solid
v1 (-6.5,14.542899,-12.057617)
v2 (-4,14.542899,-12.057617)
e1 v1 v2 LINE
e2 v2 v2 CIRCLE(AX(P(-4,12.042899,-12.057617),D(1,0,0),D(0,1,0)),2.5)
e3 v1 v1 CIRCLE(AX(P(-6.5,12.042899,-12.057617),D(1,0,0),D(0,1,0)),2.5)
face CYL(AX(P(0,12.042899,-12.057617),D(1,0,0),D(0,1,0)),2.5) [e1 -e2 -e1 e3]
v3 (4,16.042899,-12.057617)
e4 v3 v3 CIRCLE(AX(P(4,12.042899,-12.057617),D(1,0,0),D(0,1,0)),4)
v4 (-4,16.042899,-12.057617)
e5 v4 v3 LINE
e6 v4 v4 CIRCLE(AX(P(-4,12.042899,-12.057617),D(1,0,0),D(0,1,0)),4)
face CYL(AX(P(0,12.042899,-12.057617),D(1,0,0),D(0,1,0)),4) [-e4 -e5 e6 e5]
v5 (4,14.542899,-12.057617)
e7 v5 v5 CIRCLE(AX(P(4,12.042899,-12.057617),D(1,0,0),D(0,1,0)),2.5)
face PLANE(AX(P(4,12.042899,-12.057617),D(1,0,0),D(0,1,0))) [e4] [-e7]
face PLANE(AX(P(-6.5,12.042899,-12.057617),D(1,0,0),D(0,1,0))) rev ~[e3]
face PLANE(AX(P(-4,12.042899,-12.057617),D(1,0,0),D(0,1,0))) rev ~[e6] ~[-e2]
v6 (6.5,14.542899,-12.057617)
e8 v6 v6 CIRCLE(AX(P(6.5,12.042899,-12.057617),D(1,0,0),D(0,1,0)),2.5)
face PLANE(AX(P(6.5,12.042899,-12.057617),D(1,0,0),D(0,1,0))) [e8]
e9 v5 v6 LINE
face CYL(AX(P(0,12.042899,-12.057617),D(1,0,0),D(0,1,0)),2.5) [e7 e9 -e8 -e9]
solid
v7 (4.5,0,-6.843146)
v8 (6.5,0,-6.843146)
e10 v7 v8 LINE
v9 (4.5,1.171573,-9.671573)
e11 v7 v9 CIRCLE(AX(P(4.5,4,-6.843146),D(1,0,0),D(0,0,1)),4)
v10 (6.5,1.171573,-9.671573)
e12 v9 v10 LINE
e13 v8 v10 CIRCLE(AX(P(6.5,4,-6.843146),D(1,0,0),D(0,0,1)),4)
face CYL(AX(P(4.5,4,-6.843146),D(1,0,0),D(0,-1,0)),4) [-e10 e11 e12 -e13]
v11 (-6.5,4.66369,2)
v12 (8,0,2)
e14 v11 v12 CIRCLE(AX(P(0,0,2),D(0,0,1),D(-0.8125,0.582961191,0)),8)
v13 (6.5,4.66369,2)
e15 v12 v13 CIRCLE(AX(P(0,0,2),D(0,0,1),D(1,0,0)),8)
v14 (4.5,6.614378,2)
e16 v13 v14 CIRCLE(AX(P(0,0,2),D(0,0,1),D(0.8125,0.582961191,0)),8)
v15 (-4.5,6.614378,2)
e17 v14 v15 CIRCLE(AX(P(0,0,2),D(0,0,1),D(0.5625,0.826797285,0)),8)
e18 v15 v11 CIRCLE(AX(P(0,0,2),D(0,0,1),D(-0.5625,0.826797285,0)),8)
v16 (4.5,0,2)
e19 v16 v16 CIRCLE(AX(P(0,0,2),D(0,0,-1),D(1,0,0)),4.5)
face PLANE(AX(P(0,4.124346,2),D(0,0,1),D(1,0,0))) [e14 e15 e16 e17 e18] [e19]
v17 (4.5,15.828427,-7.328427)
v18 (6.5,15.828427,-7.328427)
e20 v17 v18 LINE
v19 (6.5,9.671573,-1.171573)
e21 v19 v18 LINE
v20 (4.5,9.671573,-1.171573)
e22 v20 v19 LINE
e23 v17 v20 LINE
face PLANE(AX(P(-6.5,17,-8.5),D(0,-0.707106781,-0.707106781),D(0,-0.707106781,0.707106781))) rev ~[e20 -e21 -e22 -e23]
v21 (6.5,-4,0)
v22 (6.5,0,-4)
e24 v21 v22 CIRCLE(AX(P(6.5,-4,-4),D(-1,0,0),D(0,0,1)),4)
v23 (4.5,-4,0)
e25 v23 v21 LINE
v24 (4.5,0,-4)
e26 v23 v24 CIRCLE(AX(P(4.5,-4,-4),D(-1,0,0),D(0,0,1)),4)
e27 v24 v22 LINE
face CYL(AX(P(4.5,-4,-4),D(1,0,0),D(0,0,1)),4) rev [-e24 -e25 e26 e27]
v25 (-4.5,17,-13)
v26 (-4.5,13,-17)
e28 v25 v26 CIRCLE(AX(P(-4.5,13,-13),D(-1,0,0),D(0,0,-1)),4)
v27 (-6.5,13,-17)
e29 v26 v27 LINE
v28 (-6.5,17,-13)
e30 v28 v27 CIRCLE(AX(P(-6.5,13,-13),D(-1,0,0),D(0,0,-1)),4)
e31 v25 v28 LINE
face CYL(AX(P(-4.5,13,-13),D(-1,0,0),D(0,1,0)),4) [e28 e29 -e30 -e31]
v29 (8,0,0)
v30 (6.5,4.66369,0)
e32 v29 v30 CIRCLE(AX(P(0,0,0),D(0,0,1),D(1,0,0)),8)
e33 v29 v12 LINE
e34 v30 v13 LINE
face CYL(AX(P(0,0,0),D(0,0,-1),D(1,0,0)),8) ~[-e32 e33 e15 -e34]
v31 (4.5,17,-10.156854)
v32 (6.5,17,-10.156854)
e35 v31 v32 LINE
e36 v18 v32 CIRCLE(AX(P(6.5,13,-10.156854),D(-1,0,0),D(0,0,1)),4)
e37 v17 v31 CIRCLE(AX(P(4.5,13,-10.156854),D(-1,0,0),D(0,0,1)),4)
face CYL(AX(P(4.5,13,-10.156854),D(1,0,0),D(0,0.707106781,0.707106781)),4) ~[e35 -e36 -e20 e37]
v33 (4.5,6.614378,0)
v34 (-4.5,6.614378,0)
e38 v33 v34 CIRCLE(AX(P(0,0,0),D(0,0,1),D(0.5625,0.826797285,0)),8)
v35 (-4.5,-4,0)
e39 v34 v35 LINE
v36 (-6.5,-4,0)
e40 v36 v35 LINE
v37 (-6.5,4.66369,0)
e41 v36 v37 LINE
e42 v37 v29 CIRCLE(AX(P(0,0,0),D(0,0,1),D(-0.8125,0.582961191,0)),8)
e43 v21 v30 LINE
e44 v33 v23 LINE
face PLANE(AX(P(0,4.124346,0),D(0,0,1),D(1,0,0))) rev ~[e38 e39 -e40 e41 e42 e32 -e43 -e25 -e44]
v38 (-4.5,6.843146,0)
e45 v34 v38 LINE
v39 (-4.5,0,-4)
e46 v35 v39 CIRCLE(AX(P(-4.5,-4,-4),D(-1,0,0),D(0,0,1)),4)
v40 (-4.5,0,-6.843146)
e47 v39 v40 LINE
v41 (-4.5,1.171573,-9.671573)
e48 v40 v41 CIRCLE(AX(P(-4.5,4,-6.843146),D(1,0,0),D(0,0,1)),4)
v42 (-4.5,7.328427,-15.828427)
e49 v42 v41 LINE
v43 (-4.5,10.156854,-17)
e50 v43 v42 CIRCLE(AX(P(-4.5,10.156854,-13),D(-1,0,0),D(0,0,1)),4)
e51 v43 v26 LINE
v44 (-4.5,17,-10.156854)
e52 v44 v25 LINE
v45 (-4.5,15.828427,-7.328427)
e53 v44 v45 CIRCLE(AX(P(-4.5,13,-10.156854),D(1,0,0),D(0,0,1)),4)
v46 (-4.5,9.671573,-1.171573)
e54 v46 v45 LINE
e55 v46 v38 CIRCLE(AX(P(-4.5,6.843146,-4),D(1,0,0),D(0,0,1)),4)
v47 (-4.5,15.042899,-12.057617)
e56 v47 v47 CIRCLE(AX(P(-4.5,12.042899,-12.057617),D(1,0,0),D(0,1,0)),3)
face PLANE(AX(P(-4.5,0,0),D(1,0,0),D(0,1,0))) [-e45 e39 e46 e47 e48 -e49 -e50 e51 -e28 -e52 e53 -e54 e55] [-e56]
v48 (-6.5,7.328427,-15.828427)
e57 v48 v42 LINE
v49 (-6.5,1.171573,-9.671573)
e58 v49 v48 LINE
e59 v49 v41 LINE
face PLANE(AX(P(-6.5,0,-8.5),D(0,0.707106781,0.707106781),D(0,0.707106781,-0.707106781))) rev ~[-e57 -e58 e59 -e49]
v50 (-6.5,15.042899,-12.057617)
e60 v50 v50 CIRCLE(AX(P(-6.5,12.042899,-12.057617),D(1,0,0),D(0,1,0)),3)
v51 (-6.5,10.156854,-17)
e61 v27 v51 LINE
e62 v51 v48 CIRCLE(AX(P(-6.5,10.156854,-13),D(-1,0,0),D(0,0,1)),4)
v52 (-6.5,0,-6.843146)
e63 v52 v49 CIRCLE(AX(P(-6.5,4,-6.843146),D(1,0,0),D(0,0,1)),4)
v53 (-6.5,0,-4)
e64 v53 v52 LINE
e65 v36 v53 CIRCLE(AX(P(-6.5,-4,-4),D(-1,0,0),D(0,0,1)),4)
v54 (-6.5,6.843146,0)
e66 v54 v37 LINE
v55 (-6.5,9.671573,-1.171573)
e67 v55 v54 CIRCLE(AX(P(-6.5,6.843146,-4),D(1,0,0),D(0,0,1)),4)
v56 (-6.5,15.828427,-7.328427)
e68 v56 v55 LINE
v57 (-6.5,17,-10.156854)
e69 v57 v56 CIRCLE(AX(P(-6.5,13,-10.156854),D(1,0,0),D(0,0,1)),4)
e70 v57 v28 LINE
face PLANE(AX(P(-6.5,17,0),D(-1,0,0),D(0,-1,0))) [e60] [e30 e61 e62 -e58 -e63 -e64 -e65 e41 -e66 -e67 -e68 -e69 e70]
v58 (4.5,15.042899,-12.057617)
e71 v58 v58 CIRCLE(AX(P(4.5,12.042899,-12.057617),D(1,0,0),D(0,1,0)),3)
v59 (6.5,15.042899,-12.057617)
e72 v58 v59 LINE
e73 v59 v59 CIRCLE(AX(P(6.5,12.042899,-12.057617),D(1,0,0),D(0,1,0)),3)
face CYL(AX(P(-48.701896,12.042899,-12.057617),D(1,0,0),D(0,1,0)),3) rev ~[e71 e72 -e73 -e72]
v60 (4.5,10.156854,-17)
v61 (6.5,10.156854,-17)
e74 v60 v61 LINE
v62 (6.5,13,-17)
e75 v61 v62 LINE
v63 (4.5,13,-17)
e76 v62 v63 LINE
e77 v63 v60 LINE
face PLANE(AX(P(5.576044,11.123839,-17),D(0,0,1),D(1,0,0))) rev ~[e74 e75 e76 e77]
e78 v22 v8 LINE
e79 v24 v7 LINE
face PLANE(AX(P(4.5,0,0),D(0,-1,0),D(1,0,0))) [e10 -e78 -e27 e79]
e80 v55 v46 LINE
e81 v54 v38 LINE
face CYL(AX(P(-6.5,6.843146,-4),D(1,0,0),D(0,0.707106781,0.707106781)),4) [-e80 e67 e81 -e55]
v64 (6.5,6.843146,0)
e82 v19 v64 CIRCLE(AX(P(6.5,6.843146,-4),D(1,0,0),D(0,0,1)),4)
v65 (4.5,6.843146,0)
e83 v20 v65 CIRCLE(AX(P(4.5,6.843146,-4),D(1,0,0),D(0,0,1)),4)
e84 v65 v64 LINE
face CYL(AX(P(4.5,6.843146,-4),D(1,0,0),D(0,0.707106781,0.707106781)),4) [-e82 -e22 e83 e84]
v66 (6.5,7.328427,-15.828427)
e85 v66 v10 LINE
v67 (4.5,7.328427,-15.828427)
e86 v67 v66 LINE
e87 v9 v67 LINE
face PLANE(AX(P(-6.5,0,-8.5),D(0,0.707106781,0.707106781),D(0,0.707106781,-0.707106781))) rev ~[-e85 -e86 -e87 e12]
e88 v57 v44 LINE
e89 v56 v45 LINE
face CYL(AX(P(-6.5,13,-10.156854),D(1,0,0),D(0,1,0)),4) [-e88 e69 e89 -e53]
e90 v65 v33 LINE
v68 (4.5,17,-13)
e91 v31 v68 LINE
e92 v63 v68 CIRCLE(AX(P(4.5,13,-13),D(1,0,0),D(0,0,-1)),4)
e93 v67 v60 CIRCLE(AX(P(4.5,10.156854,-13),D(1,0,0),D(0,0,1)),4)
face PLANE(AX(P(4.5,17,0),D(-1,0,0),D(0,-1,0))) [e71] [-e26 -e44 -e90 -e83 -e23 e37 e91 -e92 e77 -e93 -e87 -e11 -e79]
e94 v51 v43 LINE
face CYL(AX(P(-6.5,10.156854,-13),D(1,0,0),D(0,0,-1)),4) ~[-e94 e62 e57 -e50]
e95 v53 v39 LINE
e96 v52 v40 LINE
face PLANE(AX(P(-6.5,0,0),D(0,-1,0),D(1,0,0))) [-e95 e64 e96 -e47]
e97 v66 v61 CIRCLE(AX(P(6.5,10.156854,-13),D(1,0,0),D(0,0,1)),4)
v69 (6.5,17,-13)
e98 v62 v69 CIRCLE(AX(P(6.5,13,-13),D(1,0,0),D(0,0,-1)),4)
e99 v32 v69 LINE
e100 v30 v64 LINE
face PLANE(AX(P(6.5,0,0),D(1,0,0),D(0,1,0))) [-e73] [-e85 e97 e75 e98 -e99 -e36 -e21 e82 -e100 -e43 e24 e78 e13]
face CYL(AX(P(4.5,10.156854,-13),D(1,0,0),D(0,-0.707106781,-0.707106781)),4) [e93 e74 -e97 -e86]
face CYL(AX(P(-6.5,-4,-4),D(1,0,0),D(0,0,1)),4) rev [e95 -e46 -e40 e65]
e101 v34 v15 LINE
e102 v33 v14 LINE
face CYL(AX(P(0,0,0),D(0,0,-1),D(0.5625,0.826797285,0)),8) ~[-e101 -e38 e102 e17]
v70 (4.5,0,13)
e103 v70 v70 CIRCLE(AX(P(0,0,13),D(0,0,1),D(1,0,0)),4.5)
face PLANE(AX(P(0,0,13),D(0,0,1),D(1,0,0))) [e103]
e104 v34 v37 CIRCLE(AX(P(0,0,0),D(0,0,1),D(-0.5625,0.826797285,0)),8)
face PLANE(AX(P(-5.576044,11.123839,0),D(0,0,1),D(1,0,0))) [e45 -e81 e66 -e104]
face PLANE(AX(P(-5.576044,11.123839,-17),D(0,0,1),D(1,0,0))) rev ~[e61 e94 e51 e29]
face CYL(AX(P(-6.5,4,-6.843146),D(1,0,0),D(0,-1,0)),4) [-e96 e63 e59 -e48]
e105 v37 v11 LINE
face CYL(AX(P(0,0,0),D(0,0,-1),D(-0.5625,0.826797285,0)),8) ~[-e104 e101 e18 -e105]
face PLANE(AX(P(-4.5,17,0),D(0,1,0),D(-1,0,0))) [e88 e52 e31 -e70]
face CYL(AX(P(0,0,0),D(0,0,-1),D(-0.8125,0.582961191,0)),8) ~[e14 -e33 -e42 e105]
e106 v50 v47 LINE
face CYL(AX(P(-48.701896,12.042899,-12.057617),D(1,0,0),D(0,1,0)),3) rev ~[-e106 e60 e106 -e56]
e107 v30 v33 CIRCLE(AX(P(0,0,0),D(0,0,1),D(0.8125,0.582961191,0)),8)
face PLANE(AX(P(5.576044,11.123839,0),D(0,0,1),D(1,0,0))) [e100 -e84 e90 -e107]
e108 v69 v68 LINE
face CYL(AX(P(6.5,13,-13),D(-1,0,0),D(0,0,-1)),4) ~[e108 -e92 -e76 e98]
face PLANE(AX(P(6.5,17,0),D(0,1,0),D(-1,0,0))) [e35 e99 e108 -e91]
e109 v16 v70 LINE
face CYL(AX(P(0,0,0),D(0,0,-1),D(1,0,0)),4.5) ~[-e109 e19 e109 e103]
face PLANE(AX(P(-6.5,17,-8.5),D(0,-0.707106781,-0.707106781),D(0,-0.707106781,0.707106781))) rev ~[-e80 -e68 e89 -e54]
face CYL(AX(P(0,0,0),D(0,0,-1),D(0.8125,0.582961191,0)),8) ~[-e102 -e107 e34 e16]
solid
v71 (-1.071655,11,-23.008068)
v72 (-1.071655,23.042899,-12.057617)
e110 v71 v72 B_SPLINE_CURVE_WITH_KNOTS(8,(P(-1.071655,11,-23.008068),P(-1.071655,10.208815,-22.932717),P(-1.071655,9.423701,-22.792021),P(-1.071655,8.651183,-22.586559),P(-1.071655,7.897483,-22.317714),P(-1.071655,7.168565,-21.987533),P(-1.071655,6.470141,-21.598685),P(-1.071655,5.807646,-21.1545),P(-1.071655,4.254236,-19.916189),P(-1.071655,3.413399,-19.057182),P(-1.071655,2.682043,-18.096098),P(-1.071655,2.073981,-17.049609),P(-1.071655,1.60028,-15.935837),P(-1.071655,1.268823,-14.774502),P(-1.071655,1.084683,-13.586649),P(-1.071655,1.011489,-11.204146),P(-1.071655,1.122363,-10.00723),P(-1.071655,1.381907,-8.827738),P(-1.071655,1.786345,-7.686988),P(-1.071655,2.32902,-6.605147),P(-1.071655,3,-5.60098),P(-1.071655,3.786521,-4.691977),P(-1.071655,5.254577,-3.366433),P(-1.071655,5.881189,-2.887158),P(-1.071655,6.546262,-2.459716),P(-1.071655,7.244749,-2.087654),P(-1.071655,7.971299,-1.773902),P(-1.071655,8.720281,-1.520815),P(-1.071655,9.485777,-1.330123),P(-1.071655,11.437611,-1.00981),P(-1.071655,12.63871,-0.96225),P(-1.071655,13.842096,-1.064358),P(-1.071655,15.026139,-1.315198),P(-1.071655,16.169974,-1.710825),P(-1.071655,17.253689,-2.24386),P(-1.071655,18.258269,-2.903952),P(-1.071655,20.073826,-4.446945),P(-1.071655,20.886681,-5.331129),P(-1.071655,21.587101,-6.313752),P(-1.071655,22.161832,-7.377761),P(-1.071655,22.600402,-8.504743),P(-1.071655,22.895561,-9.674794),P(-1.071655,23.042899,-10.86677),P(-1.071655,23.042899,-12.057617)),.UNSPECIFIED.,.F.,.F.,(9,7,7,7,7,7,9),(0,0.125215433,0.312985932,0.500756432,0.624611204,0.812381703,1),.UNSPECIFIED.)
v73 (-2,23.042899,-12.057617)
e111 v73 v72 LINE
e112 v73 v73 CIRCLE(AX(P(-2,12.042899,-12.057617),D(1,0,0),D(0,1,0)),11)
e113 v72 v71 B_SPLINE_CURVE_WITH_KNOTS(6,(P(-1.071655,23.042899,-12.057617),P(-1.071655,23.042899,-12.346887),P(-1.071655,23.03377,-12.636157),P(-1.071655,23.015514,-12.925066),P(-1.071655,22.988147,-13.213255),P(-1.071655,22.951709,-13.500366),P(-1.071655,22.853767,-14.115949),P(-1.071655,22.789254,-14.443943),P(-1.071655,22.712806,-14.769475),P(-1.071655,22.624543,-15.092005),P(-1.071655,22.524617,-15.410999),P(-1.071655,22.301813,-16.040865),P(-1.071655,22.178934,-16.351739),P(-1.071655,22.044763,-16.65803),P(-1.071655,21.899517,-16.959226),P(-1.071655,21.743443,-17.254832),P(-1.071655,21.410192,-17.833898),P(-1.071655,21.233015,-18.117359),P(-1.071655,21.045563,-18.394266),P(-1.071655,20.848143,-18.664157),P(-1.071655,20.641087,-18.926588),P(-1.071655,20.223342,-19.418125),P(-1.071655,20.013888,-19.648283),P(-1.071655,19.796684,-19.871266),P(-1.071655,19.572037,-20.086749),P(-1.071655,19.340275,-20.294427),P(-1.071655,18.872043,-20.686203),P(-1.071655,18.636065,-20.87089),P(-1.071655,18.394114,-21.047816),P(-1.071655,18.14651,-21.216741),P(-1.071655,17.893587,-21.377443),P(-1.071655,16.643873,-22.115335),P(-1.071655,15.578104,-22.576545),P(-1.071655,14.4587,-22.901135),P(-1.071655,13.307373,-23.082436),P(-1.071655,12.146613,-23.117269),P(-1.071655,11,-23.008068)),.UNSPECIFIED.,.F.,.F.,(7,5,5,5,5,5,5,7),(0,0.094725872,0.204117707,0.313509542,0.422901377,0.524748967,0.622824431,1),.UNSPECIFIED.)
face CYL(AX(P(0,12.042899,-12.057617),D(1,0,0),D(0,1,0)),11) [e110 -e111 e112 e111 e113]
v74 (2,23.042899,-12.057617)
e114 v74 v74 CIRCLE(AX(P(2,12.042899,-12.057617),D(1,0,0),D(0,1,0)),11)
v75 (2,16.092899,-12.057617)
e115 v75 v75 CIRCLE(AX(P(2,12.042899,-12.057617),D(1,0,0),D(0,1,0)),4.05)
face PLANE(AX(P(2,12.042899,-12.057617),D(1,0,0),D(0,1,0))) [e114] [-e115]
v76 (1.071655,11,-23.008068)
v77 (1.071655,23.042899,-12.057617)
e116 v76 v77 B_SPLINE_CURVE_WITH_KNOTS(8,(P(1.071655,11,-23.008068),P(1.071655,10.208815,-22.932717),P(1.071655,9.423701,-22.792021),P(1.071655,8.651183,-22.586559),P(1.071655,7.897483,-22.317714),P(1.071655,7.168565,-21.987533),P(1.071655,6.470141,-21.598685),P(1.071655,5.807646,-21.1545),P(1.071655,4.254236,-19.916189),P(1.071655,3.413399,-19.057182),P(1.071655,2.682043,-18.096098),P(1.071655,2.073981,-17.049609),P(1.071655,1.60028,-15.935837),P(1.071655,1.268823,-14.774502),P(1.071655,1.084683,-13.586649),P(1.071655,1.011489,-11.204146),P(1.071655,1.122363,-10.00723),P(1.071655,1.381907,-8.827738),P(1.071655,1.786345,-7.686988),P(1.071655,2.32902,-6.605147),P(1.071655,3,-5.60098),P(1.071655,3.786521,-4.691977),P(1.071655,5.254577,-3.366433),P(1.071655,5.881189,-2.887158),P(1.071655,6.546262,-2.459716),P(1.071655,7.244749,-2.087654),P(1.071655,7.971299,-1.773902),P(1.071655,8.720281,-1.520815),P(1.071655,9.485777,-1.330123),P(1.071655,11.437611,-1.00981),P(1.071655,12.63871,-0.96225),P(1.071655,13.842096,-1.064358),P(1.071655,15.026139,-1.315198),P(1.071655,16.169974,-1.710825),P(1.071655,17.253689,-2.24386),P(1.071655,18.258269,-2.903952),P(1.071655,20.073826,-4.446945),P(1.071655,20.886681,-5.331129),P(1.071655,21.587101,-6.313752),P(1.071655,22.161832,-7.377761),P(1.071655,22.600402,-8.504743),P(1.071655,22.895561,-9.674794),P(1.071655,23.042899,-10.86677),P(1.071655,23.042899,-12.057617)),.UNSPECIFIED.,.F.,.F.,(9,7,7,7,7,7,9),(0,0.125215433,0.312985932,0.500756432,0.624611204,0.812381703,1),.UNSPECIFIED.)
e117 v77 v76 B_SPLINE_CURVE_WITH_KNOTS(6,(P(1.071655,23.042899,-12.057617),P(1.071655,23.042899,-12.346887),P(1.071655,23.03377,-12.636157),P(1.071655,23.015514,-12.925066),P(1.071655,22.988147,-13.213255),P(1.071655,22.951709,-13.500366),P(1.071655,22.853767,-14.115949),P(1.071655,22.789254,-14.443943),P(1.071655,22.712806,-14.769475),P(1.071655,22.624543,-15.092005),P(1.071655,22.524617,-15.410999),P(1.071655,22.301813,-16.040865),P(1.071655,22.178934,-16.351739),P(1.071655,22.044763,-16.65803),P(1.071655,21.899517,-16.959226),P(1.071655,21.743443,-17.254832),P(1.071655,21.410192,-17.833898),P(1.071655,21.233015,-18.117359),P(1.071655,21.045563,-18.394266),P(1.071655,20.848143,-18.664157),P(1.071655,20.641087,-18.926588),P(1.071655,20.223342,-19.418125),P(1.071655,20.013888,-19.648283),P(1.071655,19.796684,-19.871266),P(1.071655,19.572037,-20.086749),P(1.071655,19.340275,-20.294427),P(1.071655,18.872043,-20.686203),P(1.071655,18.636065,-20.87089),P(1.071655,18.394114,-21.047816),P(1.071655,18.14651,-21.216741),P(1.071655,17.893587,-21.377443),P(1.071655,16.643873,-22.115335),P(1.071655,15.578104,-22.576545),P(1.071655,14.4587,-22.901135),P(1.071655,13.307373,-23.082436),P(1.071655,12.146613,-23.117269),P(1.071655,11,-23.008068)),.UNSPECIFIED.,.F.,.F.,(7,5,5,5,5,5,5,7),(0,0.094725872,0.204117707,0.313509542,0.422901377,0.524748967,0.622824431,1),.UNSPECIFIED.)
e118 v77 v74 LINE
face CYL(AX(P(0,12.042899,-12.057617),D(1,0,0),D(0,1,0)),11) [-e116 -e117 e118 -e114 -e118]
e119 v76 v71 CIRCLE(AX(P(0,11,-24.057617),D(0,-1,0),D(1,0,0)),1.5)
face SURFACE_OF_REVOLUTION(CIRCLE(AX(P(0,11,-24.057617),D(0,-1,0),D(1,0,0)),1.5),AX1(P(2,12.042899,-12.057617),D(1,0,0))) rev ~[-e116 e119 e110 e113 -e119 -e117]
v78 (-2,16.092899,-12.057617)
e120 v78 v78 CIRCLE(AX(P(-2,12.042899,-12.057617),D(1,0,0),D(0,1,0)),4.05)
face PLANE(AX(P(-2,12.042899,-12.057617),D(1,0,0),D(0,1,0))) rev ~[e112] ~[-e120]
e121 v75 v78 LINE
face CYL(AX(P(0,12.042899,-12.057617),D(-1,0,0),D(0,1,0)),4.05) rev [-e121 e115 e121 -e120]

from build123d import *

# Parameters (mm, degrees)
F1_DEPTH  = 13
F2_DEPTH  = 2
F3_DEPTH  = 17
F5_DEPTH  = 14
F6_R      = 4
F7_D      = 6
F8_R      = 11
F8_R_2    = 4.05
F9_DEPTH  = 2
F8_R_3    = 2.5
F10_DEPTH = 6.5
F8_R_4    = 4
F11_DEPTH = 4
F13_R     = 1.5


with BuildPart() as f1:
    # F0 (on Top) → F1 (new body)
    with BuildSketch(Plane.XY):
        with BuildLine():
            ThreePointArc((-4.5, 0), (0, -4.5), (4.5, 0))
            ThreePointArc((4.5, 0), (0, 4.5), (-4.5, 0))
        make_face()
    extrude(amount=F1_DEPTH)

    # F0 (on Top) → F2 (join)
    with BuildSketch(Plane.XY):
        with BuildLine():
            ThreePointArc((-4.5, 0), (0, 4.5), (4.5, 0))
            Line((4.5, 0), (4.5, 6.6143782777))
            ThreePointArc((4.5, 6.6143782777), (0, 8), (-4.5, 6.6143782777))
            Line((-4.5, 6.6143782777), (-4.5, 0))
        make_face()
        with BuildLine():
            Line((-6.5, 0), (-4.5, 0))
            Line((-4.5, 0), (-4.5, 6.6143782777))
            ThreePointArc((-4.5, 6.6143782777), (-5.5858120852, 5.7270152217), (-6.5, 4.6636895265))
            Line((-6.5, 4.6636895265), (-6.5, 0))
        make_face()
        with BuildLine():
            Line((6.5, 0), (4.5, 0))
            ThreePointArc((4.5, 0), (0, -4.5), (-4.5, 0))
            Line((-4.5, 0), (-6.5, 0))
            Line((-6.5, 0), (-6.5, 4.6636895265))
            ThreePointArc((-6.5, 4.6636895265), (-2.4494897428, -7.6157731059), (8, 0))
            ThreePointArc((8, 0), (7.6157731059, 2.4494897428), (6.5, 4.6636895265))
            Line((6.5, 4.6636895265), (6.5, 0))
        make_face()
        with BuildLine():
            Line((4.5, 6.6143782777), (4.5, 0))
            Line((4.5, 0), (6.5, 0))
            Line((6.5, 0), (6.5, 4.6636895265))
            ThreePointArc((6.5, 4.6636895265), (5.5858120852, 5.7270152217), (4.5, 6.6143782777))
        make_face()
    extrude(amount=F2_DEPTH)

    # F0 (on Top) → F3 (join)
    with BuildSketch(Plane.XY):
        with BuildLine():
            ThreePointArc((-6.5, 4.6636895265), (-5.5858120852, 5.7270152217), (-4.5, 6.6143782777))
            Line((-4.5, 6.6143782777), (-4.5, 17))
            Line((-4.5, 17), (-6.5, 17))
            Line((-6.5, 17), (-6.5, 4.6636895265))
        make_face()
        with BuildLine():
            Line((4.5, 17), (4.5, 6.6143782777))
            ThreePointArc((4.5, 6.6143782777), (5.5858120852, 5.7270152217), (6.5, 4.6636895265))
            Line((6.5, 4.6636895265), (6.5, 17))
            Line((6.5, 17), (4.5, 17))
        make_face()
        with BuildLine():
            Line((-6.5, 0), (-4.5, 0))
            Line((-4.5, 0), (-4.5, 6.6143782777))
            ThreePointArc((-4.5, 6.6143782777), (-5.5858120852, 5.7270152217), (-6.5, 4.6636895265))
            Line((-6.5, 4.6636895265), (-6.5, 0))
        make_face()
        with BuildLine():
            Line((4.5, 6.6143782777), (4.5, 0))
            Line((4.5, 0), (6.5, 0))
            Line((6.5, 0), (6.5, 4.6636895265))
            ThreePointArc((6.5, 4.6636895265), (5.5858120852, 5.7270152217), (4.5, 6.6143782777))
        make_face()
    extrude(amount=-F3_DEPTH)

    # F4 (on face) → F5 (cut)
    with BuildSketch(Plane(origin=(-6.5, 0, 0), x_dir=(0, -1, 0), z_dir=(-1, 0, 0))):
        Polygon((-17, 0), (-17, -8.5), (-8.5, 0), align=None)
        Polygon((0, -17), (0, -8.5), (-8.5, -17), align=None)
    extrude(amount=-F5_DEPTH, mode=Mode.SUBTRACT)

    # F6
    f6_edges = [f1.edges().sort_by_distance(p)[0] for p in [
        (-5.5, 17, -17),
        (5.5, 17, -17),
        (-5.5, 0, 0),
        (5.5, 0, 0),
        (-5.5, 0, -8.5),
        (5.5, 0, -8.5),
        (5.5, 8.5, -17),
        (-5.5, 8.5, -17),
        (5.5, 17, -8.5),
        (-5.5, 17, -8.5),
        (5.5, 8.5, 0),
        (-5.5, 8.5, 0),
    ]]
    fillet(f6_edges, radius=F6_R)

    # F7 (through all)
    with Locations(Plane(origin=(-6.5, 0, 0), x_dir=(0, -1, 0), z_dir=(-1, 0, 0))):
        with Locations((-12.0428986898, -12.0576173155)):
            Hole(F7_D / 2)


with BuildPart() as f9:
    # F8 (on Right) → F9 (new body, symmetric)
    with BuildSketch(Plane.YZ):
        with Locations((12.0428986898, -12.0576173155)):
            Circle(F8_R)
        with Locations((12.0428986898, -12.0576173155)):
            Circle(F8_R_2, mode=Mode.SUBTRACT)
    extrude(amount=F9_DEPTH, both=True)

    # F13 (on offset) → F14 (revolve, cut)
    with BuildSketch(Plane.XZ.offset(-11)):
        with Locations((0, -24.0576173155)):
            Circle(F13_R)
    revolve(axis=Axis((2, 12.0428986898, -12.0576173155), (1, 0, 0)), mode=Mode.SUBTRACT)


with BuildPart() as f10:
    # F8 (on Right) → F10 (new body, symmetric)
    with BuildSketch(Plane.YZ):
        with Locations((12.0428986898, -12.0576173155)):
            Circle(F8_R_3)
    extrude(amount=F10_DEPTH, both=True)

    # F8 (on Right) → F11 (join, symmetric)
    with BuildSketch(Plane.YZ):
        with Locations((12.0428986898, -12.0576173155)):
            Circle(F8_R_4)
        with Locations((12.0428986898, -12.0576173155)):
            Circle(F8_R_3, mode=Mode.SUBTRACT)
    extrude(amount=F11_DEPTH, both=True)


solid = Compound([f1.part, f9.part, f10.part])
